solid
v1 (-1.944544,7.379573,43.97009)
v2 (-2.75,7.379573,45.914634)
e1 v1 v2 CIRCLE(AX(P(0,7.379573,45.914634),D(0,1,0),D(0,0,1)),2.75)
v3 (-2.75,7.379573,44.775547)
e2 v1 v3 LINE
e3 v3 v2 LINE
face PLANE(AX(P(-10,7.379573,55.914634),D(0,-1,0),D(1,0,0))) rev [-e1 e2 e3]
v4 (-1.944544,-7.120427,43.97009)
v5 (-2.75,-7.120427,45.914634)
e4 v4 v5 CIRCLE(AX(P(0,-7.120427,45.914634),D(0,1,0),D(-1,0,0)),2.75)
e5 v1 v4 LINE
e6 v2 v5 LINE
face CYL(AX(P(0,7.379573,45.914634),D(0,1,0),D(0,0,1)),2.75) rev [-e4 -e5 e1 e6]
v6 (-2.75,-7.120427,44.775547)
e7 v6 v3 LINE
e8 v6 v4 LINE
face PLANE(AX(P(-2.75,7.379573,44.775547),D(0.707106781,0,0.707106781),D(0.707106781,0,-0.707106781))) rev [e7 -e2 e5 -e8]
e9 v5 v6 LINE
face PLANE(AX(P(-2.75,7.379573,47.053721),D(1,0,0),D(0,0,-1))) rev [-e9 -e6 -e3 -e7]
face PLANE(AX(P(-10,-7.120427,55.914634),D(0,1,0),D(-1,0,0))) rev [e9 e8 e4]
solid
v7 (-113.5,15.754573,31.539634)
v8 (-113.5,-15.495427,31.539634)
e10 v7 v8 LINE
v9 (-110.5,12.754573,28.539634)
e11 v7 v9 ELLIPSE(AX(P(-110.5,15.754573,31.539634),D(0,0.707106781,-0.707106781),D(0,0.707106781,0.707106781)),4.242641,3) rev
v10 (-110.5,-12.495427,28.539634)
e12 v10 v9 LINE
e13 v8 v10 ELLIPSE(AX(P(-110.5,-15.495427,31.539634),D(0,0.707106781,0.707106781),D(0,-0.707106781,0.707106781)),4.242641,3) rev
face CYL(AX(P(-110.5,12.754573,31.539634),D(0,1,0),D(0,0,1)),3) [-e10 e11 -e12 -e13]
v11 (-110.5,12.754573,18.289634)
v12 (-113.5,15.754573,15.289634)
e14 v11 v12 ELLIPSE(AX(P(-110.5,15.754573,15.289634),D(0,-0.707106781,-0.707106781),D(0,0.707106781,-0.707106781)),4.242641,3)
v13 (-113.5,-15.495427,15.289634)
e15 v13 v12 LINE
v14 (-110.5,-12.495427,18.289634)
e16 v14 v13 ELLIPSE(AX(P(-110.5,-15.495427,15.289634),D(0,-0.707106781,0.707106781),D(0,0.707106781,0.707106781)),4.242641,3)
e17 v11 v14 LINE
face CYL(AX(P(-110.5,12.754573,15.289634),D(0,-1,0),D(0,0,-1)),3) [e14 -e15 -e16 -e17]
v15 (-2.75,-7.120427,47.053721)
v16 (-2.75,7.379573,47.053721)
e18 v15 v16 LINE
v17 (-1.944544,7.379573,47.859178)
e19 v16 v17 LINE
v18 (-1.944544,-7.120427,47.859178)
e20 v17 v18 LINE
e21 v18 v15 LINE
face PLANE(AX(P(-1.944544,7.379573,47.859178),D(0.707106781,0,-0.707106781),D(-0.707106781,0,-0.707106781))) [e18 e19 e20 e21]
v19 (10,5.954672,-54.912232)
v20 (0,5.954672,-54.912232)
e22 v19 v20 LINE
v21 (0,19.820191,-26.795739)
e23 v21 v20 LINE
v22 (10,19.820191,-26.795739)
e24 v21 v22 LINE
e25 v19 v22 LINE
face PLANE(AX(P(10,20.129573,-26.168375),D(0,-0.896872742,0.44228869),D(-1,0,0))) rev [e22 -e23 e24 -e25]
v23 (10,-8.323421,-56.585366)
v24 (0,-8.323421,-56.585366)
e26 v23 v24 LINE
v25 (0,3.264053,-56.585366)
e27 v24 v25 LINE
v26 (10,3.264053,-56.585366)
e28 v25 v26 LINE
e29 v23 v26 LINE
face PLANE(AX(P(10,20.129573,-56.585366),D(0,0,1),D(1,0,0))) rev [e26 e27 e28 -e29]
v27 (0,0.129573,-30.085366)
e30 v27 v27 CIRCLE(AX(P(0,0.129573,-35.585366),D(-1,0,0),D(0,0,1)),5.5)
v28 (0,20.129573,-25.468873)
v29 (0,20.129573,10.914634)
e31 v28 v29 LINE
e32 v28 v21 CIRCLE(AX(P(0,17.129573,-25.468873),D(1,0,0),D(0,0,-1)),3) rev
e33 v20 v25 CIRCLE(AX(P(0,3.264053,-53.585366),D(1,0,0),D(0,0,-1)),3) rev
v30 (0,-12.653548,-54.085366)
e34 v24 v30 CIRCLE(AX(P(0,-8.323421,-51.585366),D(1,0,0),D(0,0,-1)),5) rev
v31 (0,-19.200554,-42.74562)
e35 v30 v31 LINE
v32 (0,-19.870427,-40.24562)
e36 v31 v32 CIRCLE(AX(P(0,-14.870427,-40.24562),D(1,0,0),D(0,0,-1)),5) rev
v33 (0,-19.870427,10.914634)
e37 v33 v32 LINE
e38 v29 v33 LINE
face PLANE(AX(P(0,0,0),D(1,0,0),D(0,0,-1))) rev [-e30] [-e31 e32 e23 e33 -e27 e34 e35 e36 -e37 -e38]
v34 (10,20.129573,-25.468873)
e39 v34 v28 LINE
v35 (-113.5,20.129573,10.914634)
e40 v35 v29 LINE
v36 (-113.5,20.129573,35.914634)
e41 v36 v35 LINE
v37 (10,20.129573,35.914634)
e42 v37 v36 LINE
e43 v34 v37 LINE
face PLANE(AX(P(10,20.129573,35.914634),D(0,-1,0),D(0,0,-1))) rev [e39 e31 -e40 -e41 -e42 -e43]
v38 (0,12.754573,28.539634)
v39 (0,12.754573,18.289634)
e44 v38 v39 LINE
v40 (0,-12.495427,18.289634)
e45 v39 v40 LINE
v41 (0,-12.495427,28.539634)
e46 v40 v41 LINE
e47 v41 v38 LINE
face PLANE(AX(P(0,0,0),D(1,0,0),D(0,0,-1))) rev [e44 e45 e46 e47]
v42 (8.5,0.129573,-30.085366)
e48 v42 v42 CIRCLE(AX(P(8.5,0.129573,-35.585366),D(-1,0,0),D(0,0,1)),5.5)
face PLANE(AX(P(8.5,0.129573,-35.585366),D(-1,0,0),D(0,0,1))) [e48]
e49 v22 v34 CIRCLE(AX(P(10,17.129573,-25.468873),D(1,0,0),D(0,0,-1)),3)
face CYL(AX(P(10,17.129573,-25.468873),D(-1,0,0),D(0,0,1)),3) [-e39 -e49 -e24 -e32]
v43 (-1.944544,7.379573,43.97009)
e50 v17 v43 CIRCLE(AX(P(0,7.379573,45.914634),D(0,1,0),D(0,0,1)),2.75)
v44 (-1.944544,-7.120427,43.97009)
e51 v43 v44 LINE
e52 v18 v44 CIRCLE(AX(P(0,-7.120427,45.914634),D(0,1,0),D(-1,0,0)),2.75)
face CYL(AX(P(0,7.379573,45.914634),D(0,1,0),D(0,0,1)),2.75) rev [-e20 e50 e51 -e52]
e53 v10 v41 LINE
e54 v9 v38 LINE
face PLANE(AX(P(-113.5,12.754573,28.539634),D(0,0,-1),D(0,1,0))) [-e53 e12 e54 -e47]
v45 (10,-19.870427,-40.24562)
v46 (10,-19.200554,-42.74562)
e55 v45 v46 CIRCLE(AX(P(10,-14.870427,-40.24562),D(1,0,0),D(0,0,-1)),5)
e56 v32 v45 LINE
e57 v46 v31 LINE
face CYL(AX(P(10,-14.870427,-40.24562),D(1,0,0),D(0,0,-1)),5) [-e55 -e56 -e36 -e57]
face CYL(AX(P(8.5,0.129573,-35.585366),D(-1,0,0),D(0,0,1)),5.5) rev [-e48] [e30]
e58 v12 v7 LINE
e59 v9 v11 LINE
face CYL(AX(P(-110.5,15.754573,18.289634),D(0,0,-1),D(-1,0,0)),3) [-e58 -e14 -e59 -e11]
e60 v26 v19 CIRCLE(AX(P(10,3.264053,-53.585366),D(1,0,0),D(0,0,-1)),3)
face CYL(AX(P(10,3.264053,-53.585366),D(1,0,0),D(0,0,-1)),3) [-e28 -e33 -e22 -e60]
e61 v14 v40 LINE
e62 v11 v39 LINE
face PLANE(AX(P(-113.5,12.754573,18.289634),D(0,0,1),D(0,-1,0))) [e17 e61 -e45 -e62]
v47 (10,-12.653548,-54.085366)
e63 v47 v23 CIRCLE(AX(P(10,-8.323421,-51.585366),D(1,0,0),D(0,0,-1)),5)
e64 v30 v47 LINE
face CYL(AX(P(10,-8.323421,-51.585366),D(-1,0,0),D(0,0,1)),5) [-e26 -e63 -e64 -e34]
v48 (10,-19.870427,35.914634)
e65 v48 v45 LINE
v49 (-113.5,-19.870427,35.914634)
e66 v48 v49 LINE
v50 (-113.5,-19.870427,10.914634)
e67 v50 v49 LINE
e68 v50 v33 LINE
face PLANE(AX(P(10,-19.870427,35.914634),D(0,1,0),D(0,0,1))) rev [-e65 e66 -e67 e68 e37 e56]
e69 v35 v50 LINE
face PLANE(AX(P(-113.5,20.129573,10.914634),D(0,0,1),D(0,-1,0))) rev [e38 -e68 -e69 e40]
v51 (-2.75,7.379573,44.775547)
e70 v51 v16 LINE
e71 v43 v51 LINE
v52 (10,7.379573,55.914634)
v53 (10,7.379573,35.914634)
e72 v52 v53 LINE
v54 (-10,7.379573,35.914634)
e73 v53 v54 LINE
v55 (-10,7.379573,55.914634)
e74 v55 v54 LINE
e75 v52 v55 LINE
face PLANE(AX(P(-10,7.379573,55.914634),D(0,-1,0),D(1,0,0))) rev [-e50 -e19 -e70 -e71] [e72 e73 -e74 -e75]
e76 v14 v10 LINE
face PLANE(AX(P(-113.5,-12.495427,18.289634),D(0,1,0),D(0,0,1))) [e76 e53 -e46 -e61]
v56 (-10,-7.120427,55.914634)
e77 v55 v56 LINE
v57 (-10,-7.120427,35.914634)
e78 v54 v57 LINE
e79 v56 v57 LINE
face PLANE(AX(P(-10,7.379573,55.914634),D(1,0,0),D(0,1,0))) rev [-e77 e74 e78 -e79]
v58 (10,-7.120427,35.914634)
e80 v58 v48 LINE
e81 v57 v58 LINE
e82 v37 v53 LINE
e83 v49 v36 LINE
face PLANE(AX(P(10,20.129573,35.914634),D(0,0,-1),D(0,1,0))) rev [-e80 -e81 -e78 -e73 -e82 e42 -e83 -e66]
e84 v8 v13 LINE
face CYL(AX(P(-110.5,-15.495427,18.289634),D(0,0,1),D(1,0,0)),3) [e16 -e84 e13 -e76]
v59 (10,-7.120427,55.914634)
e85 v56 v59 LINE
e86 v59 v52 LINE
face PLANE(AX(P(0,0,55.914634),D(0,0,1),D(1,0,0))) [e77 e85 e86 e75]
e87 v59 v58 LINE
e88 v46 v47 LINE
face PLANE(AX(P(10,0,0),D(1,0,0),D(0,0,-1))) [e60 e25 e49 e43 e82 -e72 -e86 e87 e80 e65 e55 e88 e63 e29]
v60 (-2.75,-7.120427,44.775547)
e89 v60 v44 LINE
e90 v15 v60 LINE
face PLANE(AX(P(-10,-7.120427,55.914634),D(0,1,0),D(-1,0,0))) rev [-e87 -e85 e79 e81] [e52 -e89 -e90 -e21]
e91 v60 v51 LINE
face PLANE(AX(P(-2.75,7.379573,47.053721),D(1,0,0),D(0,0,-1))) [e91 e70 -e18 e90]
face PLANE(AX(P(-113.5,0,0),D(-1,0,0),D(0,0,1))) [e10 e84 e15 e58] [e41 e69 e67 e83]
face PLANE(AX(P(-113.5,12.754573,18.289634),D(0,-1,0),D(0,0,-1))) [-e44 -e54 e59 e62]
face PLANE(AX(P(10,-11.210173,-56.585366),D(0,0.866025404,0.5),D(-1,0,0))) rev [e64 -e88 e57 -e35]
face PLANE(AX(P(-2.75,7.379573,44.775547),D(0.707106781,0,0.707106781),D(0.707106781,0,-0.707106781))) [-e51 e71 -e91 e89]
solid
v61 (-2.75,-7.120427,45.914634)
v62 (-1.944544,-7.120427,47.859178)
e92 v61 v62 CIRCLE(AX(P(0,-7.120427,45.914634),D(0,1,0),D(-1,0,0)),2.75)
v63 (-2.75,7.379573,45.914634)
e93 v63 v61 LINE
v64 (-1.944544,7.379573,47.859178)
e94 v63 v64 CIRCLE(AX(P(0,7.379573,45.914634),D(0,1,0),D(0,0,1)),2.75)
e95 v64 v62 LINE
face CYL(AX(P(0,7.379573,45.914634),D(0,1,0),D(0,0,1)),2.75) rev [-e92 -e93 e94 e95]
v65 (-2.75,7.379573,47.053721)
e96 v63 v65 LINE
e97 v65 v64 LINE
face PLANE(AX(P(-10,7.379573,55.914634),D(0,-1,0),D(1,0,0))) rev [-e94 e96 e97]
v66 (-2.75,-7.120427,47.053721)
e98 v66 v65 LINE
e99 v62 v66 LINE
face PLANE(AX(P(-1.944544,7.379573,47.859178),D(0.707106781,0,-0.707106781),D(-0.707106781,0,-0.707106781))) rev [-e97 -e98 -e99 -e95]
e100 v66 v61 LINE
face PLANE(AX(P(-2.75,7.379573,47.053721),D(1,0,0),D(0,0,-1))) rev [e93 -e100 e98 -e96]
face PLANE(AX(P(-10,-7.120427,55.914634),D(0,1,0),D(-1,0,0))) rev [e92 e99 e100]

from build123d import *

# Parameters (mm, degrees)
SKETCH1_W            = 92.5
SKETCH1_H            = 40
BOSS_EXTRUDE1_DEPTH  = 10
SKETCH5_R            = 5.5
CUT_EXTRUDE1_DEPTH   = 8.5
SKETCH4_W            = 25
SKETCH4_H            = 40
SKETCH4_W_2          = 10.25
SKETCH4_H_2          = 25.25
BOSS_EXTRUDE7_DEPTH  = 113.5
FILLET1_R            = 3
CHAMFER1_SIZE        = 15
CHAMFER1_SIZE2       = 30.41699103
FILLET3_R            = 3
CHAMFER3_SIZE        = 15
CHAMFER3_SIZE2       = 8.660254038
FILLET7_R            = 5
SKETCH7_W            = 20
SKETCH7_H            = 14.5
BOSS_EXTRUDE8_DEPTH  = 20
M5_CLEARANCE_HOLE1_D = 5.5
SPLIT1_START         = -7.120426829
SPLIT1_DEPTH         = 14.5
SPLIT1_2_DEPTH       = 14.5
SPLIT1_3_DEPTH       = 14.5


# Read off the part's stored shape, not the designer's step: Split1
with BuildPart() as part:
    # Sketch1 → Boss-Extrude1 (new body)
    with BuildSketch(Plane(origin=(0, 0, 0), x_dir=(0, 0, -1), z_dir=(1, 0, 0))):
        with Locations((10.335365854, 0.129573171)):
            Rectangle(SKETCH1_W, SKETCH1_H)
    extrude(amount=BOSS_EXTRUDE1_DEPTH)

    # Sketch5 → Cut-Extrude1 (cut)
    with BuildSketch(Plane.ZY):
        with Locations((-35.585365854, 0.129573171)):
            Circle(SKETCH5_R)
    extrude(amount=-CUT_EXTRUDE1_DEPTH, mode=Mode.SUBTRACT)

    # Sketch4 → Boss-Extrude7 (add)
    with BuildSketch(Plane.ZY):
        with Locations((23.414634146, 0.129573171)):
            Rectangle(SKETCH4_W, SKETCH4_H)
        with Locations((23.414634146, 0.129573171)):
            Rectangle(SKETCH4_W_2, SKETCH4_H_2, mode=Mode.SUBTRACT)
    extrude(amount=BOSS_EXTRUDE7_DEPTH)

    # Fillet1
    fillet1_edges = [part.edges().sort_by_distance(p)[0] for p in [
        (-113.5, 12.754573171, 23.414634146),
        (-113.5, 0.129573171, 18.289634146),
        (-113.5, -12.495426829, 23.414634146),
        (-113.5, 0.129573171, 28.539634146),
    ]]
    fillet(fillet1_edges, radius=FILLET1_R)

    # Chamfer1
    chamfer1_edges = [part.edges().sort_by_distance(p)[0] for p in [
        (5, 20.129573171, -56.585365854),
    ]]
    chamfer1_side = [part.faces().sort_by_distance(p)[0] for p in [
        (5, 0.129573171, -56.585365854),
    ]]
    chamfer(chamfer1_edges, length=CHAMFER1_SIZE, length2=CHAMFER1_SIZE2, reference=chamfer1_side[0])

    # Fillet3
    fillet3_edges = [part.edges().sort_by_distance(p)[0] for p in [
        (5, 20.129573171, -26.168374824),
        (5, 5.129573171, -56.585365854),
    ]]
    fillet(fillet3_edges, radius=FILLET3_R)

    # Chamfer3
    chamfer3_edges = [part.edges().sort_by_distance(p)[0] for p in [
        (5, -19.870426829, -56.585365854),
    ]]
    chamfer3_side = [part.faces().sort_by_distance(p)[0] for p in [
        (-41.568936877, -19.870426829, 15.117291954),
    ]]
    chamfer(chamfer3_edges, length=CHAMFER3_SIZE, length2=CHAMFER3_SIZE2, reference=chamfer3_side[0])

    # Fillet7
    fillet7_edges = [part.edges().sort_by_distance(p)[0] for p in [
        (5, -11.210172791, -56.585365854),
        (5, -19.870426829, -41.585365854),
    ]]
    fillet(fillet7_edges, radius=FILLET7_R)

    # Sketch7 → Boss-Extrude8 (add)
    with BuildSketch(Plane(origin=(10, 20.129573171, 35.914634146), x_dir=(1, 0, 0), z_dir=(0, 0, 1))):
        with Locations((-10, -20)):
            Rectangle(SKETCH7_W, SKETCH7_H)
    extrude(amount=BOSS_EXTRUDE8_DEPTH)

    # M5 Clearance Hole1 (through all)
    with Locations(Plane(origin=(0, 7.379573171, 0), x_dir=(1, 0, 0), z_dir=(0, 1, 0))):
        with Locations((0, -45.914634146)):
            Hole(M5_CLEARANCE_HOLE1_D / 2)

    # Split1 outline → Split1 (cut)
    with BuildSketch(Plane(origin=(0, 0, 0), x_dir=(1, 0, 0), z_dir=(0, 1, 0)).offset(SPLIT1_START)):
        with BuildLine():
            Line((-2.75, -45.914634146), (-2.75, -47.053721443))
            Line((-2.75, -47.053721443), (-1.944543648, -47.859177795))
            ThreePointArc((-1.944543648, -47.859177795), (-2.540668714, -46.967013585), (-2.75, -45.914634146))
        make_face()
        with BuildLine():
            Line((-2.75, -44.77554685), (-2.75, -45.914634146))
            ThreePointArc((-2.75, -45.914634146), (-2.540668714, -44.862254707), (-1.944543648, -43.970090498))
            Line((-1.944543648, -43.970090498), (-2.75, -44.77554685))
        make_face()
    extrude(amount=SPLIT1_DEPTH, mode=Mode.SUBTRACT)


with BuildPart() as body_2:
    # Split1 2 outline → Split1 2 (new body)
    with BuildSketch(Plane(origin=(0, 0, 0), x_dir=(1, 0, 0), z_dir=(0, 1, 0)).offset(SPLIT1_START)):
        with BuildLine():
            Line((-2.75, -45.914634146), (-2.75, -47.053721443))
            Line((-2.75, -47.053721443), (-1.944543648, -47.859177795))
            ThreePointArc((-1.944543648, -47.859177795), (-2.540668714, -46.967013585), (-2.75, -45.914634146))
        make_face()
    extrude(amount=SPLIT1_2_DEPTH)


with BuildPart() as body_3:
    # Split1 3 outline → Split1 3 (new body)
    with BuildSketch(Plane(origin=(0, 0, 0), x_dir=(1, 0, 0), z_dir=(0, 1, 0)).offset(SPLIT1_START)):
        with BuildLine():
            Line((-1.944543648, -43.970090498), (-2.75, -44.77554685))
            Line((-2.75, -44.77554685), (-2.75, -45.914634146))
            ThreePointArc((-2.75, -45.914634146), (-2.540668714, -44.862254707), (-1.944543648, -43.970090498))
        make_face()
    extrude(amount=SPLIT1_3_DEPTH)


solid = Compound([part.part, body_2.part, body_3.part])
